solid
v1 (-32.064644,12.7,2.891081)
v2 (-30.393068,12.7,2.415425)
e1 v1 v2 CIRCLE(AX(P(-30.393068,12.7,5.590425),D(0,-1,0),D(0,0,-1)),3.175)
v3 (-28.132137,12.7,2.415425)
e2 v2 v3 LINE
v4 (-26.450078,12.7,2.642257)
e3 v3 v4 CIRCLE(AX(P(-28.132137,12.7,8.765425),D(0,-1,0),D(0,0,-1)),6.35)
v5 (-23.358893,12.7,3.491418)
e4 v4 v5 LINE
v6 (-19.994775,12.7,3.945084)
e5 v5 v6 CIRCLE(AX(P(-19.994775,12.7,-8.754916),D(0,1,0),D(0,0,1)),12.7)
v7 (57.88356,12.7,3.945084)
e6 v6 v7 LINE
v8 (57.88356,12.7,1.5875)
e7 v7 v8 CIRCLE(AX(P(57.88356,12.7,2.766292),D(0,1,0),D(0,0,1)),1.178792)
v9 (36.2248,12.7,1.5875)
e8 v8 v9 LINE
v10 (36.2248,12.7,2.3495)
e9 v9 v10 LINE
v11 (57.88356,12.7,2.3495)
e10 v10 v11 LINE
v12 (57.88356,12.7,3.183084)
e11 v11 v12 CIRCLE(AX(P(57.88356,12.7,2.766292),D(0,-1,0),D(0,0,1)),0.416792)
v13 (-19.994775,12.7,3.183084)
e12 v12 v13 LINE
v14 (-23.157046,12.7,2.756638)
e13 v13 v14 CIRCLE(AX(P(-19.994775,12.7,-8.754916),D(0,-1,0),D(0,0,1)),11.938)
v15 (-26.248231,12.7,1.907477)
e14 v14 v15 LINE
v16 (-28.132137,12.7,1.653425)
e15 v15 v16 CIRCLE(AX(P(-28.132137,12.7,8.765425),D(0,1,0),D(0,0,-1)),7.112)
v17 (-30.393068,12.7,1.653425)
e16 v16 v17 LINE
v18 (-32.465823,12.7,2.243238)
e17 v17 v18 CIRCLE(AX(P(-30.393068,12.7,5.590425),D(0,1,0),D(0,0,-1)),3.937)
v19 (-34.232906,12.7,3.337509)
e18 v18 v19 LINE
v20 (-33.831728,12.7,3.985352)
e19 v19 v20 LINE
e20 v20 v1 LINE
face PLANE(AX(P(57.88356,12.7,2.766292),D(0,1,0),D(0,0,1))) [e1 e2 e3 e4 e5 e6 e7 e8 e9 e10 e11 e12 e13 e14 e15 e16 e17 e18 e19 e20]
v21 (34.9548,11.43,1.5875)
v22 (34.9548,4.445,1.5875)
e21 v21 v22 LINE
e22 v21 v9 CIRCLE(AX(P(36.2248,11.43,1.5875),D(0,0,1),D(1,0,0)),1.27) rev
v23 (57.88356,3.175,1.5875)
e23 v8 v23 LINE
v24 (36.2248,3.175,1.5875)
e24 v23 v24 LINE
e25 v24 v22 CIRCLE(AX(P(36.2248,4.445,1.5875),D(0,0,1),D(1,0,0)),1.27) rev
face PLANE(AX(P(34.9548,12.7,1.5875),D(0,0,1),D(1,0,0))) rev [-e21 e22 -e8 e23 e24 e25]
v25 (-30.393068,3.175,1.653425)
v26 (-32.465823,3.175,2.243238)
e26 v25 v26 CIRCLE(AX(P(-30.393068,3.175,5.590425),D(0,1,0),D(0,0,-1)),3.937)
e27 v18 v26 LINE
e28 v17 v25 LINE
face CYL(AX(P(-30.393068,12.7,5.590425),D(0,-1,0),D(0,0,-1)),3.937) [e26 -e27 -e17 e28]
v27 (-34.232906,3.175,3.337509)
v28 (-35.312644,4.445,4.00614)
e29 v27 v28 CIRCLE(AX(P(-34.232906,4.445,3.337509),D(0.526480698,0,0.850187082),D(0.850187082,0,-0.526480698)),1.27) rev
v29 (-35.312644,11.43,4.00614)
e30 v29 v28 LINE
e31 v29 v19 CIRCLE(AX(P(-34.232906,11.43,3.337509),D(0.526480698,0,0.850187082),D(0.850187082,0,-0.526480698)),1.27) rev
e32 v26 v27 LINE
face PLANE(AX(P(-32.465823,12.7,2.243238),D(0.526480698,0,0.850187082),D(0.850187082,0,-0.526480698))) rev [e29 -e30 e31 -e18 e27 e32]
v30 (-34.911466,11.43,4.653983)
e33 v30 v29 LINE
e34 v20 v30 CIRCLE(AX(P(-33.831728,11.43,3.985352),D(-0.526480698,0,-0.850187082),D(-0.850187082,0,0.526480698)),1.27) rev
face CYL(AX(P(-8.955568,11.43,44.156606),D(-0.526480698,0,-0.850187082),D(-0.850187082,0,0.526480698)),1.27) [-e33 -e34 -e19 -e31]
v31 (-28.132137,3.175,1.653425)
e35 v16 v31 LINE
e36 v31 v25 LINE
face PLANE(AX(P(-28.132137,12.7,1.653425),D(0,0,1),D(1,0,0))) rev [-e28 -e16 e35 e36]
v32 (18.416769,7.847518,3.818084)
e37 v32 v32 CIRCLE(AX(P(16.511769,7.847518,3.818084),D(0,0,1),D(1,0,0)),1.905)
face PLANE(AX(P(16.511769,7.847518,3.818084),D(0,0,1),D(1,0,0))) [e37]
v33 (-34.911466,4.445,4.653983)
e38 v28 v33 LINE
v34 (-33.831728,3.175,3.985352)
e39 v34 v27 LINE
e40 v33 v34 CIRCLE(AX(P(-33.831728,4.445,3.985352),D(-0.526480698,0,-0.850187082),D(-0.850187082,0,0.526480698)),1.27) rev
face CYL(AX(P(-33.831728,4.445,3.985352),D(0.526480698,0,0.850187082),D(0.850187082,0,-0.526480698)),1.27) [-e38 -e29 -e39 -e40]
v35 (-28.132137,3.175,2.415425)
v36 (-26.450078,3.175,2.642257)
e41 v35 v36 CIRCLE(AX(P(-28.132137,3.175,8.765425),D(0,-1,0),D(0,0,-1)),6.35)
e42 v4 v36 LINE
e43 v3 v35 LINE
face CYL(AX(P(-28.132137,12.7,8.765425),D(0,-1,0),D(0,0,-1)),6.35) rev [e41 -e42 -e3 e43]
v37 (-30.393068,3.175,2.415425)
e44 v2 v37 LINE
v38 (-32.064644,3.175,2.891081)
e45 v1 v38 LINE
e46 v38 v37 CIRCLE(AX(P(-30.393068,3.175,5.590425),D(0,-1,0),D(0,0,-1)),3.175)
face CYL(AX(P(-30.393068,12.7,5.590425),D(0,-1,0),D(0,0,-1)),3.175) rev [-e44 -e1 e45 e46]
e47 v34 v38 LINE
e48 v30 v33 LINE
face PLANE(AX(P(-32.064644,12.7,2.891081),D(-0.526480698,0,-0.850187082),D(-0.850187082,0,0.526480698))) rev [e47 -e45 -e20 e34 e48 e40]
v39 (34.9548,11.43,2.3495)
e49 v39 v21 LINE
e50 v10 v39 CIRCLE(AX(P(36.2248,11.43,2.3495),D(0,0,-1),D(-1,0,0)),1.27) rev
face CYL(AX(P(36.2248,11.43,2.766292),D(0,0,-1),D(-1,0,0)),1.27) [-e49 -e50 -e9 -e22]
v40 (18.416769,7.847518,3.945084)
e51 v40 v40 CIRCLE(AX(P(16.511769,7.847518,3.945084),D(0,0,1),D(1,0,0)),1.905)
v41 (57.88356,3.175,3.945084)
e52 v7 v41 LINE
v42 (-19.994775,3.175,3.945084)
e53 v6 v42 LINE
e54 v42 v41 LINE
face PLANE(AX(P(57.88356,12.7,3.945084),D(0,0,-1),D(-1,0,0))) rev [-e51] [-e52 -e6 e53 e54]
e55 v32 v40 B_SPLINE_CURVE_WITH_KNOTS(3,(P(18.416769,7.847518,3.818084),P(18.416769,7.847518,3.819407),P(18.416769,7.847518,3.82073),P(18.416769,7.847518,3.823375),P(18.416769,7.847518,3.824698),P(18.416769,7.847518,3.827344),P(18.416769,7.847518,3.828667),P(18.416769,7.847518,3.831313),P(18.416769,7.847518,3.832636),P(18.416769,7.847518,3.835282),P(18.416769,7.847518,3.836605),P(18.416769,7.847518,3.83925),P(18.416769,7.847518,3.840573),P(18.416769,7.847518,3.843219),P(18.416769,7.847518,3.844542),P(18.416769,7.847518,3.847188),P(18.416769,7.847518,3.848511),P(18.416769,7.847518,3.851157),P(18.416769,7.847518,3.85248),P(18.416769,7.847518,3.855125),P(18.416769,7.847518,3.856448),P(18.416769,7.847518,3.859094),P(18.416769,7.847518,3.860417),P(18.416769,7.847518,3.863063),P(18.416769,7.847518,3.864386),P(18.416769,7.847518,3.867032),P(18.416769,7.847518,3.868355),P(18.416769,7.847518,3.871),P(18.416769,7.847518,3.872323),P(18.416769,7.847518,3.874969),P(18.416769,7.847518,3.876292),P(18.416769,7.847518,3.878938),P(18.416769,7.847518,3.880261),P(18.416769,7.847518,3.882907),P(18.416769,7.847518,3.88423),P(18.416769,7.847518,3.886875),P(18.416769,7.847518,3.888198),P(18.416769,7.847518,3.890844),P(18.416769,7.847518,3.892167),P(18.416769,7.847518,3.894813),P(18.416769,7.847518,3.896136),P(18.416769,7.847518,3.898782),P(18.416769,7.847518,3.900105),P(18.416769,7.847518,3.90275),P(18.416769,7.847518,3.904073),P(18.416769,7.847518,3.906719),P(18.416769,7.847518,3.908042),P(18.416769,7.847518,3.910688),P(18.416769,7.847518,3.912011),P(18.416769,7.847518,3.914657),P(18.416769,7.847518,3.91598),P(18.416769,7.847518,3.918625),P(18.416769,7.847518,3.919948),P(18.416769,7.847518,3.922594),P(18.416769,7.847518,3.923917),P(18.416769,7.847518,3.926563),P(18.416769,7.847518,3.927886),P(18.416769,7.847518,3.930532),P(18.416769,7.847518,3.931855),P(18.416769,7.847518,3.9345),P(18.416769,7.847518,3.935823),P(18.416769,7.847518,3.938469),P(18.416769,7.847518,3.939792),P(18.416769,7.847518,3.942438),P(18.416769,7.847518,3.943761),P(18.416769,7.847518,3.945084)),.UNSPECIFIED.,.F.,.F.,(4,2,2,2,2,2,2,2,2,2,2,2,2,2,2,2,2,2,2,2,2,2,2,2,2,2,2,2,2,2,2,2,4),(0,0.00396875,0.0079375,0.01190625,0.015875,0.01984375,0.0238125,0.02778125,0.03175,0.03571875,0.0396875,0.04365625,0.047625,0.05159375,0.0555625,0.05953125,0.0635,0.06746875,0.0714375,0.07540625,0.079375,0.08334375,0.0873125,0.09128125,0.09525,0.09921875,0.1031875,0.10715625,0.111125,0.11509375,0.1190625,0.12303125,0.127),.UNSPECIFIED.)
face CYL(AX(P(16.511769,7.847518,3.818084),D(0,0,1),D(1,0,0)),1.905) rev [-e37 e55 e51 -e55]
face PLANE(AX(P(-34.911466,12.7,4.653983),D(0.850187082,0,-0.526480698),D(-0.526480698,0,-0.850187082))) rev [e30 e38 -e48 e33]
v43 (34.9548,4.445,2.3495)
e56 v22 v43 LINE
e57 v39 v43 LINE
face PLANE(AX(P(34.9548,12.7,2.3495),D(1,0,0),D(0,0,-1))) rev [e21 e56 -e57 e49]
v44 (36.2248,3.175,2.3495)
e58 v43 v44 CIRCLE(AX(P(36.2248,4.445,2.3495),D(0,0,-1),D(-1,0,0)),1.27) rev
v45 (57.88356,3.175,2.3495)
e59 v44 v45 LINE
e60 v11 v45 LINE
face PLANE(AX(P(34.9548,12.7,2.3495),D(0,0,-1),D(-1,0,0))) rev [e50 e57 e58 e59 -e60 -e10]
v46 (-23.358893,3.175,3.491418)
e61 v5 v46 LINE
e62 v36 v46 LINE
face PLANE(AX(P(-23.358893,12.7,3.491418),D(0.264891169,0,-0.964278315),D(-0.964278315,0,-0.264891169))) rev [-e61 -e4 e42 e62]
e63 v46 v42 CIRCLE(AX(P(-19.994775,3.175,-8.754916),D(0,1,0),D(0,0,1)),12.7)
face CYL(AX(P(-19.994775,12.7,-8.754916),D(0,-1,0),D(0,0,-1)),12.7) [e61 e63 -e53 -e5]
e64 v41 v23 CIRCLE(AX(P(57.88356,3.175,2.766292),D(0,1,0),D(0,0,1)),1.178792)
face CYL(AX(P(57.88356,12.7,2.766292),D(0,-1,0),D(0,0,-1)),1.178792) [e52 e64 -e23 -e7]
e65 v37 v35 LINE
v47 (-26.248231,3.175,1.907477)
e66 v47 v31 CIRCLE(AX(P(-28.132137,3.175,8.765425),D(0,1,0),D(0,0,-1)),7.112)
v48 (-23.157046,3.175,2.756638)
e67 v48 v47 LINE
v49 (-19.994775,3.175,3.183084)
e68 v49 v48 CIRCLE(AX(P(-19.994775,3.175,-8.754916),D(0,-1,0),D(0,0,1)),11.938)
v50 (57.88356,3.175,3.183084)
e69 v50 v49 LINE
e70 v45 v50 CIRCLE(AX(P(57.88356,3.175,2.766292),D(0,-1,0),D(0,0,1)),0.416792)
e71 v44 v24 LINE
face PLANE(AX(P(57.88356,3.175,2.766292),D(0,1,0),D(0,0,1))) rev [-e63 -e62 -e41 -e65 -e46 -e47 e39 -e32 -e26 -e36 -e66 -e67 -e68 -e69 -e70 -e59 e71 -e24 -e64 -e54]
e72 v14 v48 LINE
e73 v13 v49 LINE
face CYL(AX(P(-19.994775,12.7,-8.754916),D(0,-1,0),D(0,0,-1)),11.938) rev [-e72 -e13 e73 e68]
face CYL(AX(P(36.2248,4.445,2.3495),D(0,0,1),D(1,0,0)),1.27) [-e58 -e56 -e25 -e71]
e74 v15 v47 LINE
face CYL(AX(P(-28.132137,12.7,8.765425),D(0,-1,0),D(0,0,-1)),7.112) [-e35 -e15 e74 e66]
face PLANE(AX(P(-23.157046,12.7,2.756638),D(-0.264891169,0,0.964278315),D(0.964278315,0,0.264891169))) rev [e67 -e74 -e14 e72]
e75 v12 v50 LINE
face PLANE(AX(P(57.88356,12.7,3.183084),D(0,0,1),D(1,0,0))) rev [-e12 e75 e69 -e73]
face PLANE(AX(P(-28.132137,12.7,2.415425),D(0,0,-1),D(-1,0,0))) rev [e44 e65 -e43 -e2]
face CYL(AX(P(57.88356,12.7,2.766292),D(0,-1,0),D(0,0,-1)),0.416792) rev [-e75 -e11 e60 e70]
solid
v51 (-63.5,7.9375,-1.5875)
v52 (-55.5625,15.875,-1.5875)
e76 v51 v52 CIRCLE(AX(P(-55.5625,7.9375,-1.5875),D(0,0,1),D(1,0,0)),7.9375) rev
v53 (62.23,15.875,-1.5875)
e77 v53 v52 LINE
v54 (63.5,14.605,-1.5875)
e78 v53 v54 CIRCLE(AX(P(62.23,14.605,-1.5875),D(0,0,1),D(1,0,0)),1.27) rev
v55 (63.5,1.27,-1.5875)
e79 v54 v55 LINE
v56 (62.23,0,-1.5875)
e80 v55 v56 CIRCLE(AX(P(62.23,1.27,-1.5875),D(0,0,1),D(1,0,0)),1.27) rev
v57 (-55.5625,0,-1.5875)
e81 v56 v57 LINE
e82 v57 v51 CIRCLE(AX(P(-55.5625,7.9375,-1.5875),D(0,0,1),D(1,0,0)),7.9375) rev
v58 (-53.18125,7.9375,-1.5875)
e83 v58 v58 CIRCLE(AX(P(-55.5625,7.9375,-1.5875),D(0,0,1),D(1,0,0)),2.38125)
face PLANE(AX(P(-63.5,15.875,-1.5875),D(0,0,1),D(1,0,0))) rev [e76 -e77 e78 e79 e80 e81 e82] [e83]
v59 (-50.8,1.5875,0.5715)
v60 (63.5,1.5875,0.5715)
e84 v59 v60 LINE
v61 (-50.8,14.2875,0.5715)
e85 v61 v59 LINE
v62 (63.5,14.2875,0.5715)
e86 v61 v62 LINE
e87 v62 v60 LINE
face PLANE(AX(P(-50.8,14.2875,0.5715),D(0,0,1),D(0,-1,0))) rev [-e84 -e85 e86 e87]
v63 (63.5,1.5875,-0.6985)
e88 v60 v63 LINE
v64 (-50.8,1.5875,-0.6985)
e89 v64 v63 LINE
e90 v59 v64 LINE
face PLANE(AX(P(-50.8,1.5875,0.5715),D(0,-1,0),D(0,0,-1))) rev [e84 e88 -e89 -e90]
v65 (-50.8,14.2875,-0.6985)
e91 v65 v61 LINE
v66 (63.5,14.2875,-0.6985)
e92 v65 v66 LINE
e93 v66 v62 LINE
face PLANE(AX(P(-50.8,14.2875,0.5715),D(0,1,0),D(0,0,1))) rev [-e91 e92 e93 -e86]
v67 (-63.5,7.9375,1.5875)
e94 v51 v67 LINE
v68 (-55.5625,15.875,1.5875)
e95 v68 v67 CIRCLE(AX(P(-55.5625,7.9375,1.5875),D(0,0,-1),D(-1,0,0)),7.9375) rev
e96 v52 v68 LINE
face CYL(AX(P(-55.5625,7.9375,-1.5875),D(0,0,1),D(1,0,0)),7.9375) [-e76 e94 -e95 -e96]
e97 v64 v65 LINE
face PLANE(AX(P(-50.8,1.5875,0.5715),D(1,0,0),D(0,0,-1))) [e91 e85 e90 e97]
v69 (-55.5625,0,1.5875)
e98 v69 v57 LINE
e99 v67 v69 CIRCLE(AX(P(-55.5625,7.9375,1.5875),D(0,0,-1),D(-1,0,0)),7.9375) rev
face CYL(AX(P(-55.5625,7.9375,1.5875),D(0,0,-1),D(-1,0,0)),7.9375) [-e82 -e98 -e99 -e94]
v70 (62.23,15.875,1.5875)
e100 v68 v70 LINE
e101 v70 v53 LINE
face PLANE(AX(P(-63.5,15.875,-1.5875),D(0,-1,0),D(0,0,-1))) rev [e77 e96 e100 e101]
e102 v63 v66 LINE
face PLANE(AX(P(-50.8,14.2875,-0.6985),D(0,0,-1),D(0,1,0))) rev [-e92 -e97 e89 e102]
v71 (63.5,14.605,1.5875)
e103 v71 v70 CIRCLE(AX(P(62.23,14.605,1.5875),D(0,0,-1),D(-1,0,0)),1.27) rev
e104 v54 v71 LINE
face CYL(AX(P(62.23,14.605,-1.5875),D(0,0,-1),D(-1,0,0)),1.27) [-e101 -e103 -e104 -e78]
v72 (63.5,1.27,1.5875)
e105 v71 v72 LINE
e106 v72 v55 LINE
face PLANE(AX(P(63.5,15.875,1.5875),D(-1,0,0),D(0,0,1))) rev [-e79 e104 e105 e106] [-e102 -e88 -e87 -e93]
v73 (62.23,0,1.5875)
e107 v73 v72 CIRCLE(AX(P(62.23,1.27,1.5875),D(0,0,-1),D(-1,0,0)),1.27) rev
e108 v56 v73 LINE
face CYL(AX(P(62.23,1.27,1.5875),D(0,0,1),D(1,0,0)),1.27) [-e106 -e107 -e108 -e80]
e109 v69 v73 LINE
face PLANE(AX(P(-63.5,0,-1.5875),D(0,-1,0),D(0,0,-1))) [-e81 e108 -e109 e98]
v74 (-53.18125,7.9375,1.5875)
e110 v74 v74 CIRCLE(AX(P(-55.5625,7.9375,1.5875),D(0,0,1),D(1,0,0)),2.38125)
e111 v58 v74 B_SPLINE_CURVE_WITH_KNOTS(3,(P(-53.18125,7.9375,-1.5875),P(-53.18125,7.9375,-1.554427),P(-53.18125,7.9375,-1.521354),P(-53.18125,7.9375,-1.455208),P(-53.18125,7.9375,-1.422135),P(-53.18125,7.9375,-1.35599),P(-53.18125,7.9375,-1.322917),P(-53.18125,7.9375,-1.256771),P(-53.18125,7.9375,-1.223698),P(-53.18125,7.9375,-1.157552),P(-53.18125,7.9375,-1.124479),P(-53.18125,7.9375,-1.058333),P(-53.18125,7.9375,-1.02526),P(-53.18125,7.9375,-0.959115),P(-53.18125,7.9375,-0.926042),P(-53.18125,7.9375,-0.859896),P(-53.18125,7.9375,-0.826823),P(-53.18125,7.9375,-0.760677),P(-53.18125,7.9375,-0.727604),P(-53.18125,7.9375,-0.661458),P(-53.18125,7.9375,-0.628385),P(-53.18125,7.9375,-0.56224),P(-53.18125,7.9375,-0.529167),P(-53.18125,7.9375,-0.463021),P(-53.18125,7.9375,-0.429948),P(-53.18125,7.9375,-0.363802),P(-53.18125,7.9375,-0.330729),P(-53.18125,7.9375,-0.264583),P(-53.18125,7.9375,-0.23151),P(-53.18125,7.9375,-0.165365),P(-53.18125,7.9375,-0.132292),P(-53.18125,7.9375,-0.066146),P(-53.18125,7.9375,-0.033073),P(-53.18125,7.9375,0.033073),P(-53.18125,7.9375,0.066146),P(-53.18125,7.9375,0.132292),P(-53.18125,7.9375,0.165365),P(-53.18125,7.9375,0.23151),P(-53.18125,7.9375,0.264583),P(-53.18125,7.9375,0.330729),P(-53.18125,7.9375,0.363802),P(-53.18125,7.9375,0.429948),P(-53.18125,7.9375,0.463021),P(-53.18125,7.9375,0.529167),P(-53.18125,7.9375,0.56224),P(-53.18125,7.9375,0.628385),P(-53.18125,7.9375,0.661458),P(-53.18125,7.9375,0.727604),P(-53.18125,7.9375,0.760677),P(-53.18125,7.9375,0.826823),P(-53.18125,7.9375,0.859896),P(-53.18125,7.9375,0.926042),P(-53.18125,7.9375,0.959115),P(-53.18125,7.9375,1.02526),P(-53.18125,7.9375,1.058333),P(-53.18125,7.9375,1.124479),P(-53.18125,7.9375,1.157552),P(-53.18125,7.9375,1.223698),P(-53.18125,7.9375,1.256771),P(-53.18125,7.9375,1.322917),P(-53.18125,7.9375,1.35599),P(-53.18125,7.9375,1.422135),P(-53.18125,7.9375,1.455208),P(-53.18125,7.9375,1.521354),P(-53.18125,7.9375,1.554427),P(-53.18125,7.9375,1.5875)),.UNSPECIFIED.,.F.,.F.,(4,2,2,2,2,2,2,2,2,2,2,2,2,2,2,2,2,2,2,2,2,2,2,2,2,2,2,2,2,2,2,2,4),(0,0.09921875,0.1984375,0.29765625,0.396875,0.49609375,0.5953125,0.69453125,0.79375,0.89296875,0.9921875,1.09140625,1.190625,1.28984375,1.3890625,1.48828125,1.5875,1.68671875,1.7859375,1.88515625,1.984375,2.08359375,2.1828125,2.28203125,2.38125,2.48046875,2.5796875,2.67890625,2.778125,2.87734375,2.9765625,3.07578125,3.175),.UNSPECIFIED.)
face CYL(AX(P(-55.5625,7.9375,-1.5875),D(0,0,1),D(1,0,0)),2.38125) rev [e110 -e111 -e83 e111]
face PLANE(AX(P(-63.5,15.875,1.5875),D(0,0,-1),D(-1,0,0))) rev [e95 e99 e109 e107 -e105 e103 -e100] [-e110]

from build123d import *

# Parameters (mm, degrees)
SKETCH1_W           = 127
SKETCH1_H           = 3.175
BASE_EXTRUDE_DEPTH  = 15.875
FILLET1_R           = 7.9375
SKETCH2_R           = 2.38125
CUT_EXTRUDE1_DEPTH  = 66.531261624
SKETCH4_W           = 1.27
SKETCH4_H           = 12.7
CUT_EXTRUDE2_DEPTH  = 114.3
BOSS_EXTRUDE1_DEPTH = 4.7625
FILLET2_R           = 1.27
FILLET3_R           = 1.27
SKETCH8_R           = 1.905
CUT_EXTRUDE3_DEPTH  = 0.127


with BuildPart() as part:
    # Sketch1 → Base-Extrude (new body)
    with BuildSketch(Plane(origin=(0, 0, 0), x_dir=(1, 0, 0), z_dir=(0, 1, 0))):
        Rectangle(SKETCH1_W, SKETCH1_H)
    extrude(amount=BASE_EXTRUDE_DEPTH)

    # Fillet1
    fillet1_edges = [part.edges().sort_by_distance(p)[0] for p in [
        (-63.5, 15.875, 0),
        (-63.5, 0, 0),
    ]]
    fillet(fillet1_edges, radius=FILLET1_R - 0.0001)  # a hair under: the kernel refuses the full size

    # Sketch2 → Cut-Extrude1 (cut, through all)
    with BuildSketch(Plane.XY.offset(1.5875)):
        with Locations((-55.5625, 7.9375)):
            Circle(SKETCH2_R)
    extrude(amount=-CUT_EXTRUDE1_DEPTH, mode=Mode.SUBTRACT)

    # Sketch4 → Cut-Extrude2 (cut)
    with BuildSketch(Plane(origin=(63.5, 0, 0), x_dir=(0, 0, -1), z_dir=(1, 0, 0))):
        with Locations((0.0635, 7.9375)):
            Rectangle(SKETCH4_W, SKETCH4_H)
    extrude(amount=-CUT_EXTRUDE2_DEPTH, mode=Mode.SUBTRACT)

    # Fillet2
    fillet2_edges = [part.edges().sort_by_distance(p)[0] for p in [
        (63.5, 15.875, 0),
        (63.5, 0, 0),
    ]]
    fillet(fillet2_edges, radius=FILLET2_R)


with BuildPart() as body_2:
    # Sketch5 → Boss-Extrude1 (new, symmetric)
    with BuildSketch(Plane(origin=(0, 7.9375, 0), x_dir=(-1, 0, 0), z_dir=(0, 1, 0))):
        with BuildLine():
            Line((-34.954800237, 1.5875), (-57.883560189, 1.5875))
            ThreePointArc((-57.883560189, 1.5875), (-59.062352087, 2.766291898), (-57.883560189, 3.945083796))
            Line((-57.883560189, 3.945083796), (19.994775417, 3.945083796))
            ThreePointArc((19.994775417, 3.945083796), (21.6920601, 3.831156444), (23.358893265, 3.491418395))
            Line((23.358893265, 3.491418395), (26.450077985, 2.642257398))
            ThreePointArc((26.450077985, 2.642257398), (27.283494567, 2.472388373), (28.132136909, 2.415424698))
            Line((28.132136909, 2.415424698), (30.393068236, 2.415424698))
            ThreePointArc((30.393068236, 2.415424698), (31.262035394, 2.536653082), (32.064644452, 2.891080712))
            Line((32.064644452, 2.891080712), (34.911465551, 4.653982537))
            Line((34.911465551, 4.653982537), (35.312643843, 4.006139981))
            Line((35.312643843, 4.006139981), (32.465822744, 2.243238155))
            ThreePointArc((32.465822744, 2.243238155), (31.470587512, 1.803747895), (30.393068236, 1.653424698))
            Line((30.393068236, 1.653424698), (28.132136909, 1.653424698))
            ThreePointArc((28.132136909, 1.653424698), (27.181657486, 1.717224015), (26.248230914, 1.907477322))
            Line((26.248230914, 1.907477322), (23.157046194, 2.756638319))
            ThreePointArc((23.157046194, 2.756638319), (21.590223019, 3.075992085), (19.994775417, 3.183083796))
            Line((19.994775417, 3.183083796), (-57.883560189, 3.183083796))
            ThreePointArc((-57.883560189, 3.183083796), (-58.300352087, 2.766291898), (-57.883560189, 2.3495))
            Line((-57.883560189, 2.3495), (-34.954800237, 2.3495))
            Line((-34.954800237, 2.3495), (-34.954800237, 1.5875))
        make_face()
    extrude(amount=BOSS_EXTRUDE1_DEPTH, both=True)

    # Fillet3
    fillet3_edges = [body_2.edges().sort_by_distance(p)[0] for p in [
        (-35.112054697, 3.175, 4.330061259),
        (34.954800237, 3.175, 1.9685),
        (-35.112054697, 12.7, 4.330061259),
        (34.954800237, 12.7, 1.9685),
    ]]
    fillet(fillet3_edges, radius=FILLET3_R)

    # Sketch8 → Cut-Extrude3 (cut)
    with BuildSketch(Plane.XY.offset(3.945083796)):
        with Locations((16.511768765, 7.847518323)):
            Circle(SKETCH8_R)
    extrude(amount=-CUT_EXTRUDE3_DEPTH, mode=Mode.SUBTRACT)


solid = Compound([part.part, body_2.part])
